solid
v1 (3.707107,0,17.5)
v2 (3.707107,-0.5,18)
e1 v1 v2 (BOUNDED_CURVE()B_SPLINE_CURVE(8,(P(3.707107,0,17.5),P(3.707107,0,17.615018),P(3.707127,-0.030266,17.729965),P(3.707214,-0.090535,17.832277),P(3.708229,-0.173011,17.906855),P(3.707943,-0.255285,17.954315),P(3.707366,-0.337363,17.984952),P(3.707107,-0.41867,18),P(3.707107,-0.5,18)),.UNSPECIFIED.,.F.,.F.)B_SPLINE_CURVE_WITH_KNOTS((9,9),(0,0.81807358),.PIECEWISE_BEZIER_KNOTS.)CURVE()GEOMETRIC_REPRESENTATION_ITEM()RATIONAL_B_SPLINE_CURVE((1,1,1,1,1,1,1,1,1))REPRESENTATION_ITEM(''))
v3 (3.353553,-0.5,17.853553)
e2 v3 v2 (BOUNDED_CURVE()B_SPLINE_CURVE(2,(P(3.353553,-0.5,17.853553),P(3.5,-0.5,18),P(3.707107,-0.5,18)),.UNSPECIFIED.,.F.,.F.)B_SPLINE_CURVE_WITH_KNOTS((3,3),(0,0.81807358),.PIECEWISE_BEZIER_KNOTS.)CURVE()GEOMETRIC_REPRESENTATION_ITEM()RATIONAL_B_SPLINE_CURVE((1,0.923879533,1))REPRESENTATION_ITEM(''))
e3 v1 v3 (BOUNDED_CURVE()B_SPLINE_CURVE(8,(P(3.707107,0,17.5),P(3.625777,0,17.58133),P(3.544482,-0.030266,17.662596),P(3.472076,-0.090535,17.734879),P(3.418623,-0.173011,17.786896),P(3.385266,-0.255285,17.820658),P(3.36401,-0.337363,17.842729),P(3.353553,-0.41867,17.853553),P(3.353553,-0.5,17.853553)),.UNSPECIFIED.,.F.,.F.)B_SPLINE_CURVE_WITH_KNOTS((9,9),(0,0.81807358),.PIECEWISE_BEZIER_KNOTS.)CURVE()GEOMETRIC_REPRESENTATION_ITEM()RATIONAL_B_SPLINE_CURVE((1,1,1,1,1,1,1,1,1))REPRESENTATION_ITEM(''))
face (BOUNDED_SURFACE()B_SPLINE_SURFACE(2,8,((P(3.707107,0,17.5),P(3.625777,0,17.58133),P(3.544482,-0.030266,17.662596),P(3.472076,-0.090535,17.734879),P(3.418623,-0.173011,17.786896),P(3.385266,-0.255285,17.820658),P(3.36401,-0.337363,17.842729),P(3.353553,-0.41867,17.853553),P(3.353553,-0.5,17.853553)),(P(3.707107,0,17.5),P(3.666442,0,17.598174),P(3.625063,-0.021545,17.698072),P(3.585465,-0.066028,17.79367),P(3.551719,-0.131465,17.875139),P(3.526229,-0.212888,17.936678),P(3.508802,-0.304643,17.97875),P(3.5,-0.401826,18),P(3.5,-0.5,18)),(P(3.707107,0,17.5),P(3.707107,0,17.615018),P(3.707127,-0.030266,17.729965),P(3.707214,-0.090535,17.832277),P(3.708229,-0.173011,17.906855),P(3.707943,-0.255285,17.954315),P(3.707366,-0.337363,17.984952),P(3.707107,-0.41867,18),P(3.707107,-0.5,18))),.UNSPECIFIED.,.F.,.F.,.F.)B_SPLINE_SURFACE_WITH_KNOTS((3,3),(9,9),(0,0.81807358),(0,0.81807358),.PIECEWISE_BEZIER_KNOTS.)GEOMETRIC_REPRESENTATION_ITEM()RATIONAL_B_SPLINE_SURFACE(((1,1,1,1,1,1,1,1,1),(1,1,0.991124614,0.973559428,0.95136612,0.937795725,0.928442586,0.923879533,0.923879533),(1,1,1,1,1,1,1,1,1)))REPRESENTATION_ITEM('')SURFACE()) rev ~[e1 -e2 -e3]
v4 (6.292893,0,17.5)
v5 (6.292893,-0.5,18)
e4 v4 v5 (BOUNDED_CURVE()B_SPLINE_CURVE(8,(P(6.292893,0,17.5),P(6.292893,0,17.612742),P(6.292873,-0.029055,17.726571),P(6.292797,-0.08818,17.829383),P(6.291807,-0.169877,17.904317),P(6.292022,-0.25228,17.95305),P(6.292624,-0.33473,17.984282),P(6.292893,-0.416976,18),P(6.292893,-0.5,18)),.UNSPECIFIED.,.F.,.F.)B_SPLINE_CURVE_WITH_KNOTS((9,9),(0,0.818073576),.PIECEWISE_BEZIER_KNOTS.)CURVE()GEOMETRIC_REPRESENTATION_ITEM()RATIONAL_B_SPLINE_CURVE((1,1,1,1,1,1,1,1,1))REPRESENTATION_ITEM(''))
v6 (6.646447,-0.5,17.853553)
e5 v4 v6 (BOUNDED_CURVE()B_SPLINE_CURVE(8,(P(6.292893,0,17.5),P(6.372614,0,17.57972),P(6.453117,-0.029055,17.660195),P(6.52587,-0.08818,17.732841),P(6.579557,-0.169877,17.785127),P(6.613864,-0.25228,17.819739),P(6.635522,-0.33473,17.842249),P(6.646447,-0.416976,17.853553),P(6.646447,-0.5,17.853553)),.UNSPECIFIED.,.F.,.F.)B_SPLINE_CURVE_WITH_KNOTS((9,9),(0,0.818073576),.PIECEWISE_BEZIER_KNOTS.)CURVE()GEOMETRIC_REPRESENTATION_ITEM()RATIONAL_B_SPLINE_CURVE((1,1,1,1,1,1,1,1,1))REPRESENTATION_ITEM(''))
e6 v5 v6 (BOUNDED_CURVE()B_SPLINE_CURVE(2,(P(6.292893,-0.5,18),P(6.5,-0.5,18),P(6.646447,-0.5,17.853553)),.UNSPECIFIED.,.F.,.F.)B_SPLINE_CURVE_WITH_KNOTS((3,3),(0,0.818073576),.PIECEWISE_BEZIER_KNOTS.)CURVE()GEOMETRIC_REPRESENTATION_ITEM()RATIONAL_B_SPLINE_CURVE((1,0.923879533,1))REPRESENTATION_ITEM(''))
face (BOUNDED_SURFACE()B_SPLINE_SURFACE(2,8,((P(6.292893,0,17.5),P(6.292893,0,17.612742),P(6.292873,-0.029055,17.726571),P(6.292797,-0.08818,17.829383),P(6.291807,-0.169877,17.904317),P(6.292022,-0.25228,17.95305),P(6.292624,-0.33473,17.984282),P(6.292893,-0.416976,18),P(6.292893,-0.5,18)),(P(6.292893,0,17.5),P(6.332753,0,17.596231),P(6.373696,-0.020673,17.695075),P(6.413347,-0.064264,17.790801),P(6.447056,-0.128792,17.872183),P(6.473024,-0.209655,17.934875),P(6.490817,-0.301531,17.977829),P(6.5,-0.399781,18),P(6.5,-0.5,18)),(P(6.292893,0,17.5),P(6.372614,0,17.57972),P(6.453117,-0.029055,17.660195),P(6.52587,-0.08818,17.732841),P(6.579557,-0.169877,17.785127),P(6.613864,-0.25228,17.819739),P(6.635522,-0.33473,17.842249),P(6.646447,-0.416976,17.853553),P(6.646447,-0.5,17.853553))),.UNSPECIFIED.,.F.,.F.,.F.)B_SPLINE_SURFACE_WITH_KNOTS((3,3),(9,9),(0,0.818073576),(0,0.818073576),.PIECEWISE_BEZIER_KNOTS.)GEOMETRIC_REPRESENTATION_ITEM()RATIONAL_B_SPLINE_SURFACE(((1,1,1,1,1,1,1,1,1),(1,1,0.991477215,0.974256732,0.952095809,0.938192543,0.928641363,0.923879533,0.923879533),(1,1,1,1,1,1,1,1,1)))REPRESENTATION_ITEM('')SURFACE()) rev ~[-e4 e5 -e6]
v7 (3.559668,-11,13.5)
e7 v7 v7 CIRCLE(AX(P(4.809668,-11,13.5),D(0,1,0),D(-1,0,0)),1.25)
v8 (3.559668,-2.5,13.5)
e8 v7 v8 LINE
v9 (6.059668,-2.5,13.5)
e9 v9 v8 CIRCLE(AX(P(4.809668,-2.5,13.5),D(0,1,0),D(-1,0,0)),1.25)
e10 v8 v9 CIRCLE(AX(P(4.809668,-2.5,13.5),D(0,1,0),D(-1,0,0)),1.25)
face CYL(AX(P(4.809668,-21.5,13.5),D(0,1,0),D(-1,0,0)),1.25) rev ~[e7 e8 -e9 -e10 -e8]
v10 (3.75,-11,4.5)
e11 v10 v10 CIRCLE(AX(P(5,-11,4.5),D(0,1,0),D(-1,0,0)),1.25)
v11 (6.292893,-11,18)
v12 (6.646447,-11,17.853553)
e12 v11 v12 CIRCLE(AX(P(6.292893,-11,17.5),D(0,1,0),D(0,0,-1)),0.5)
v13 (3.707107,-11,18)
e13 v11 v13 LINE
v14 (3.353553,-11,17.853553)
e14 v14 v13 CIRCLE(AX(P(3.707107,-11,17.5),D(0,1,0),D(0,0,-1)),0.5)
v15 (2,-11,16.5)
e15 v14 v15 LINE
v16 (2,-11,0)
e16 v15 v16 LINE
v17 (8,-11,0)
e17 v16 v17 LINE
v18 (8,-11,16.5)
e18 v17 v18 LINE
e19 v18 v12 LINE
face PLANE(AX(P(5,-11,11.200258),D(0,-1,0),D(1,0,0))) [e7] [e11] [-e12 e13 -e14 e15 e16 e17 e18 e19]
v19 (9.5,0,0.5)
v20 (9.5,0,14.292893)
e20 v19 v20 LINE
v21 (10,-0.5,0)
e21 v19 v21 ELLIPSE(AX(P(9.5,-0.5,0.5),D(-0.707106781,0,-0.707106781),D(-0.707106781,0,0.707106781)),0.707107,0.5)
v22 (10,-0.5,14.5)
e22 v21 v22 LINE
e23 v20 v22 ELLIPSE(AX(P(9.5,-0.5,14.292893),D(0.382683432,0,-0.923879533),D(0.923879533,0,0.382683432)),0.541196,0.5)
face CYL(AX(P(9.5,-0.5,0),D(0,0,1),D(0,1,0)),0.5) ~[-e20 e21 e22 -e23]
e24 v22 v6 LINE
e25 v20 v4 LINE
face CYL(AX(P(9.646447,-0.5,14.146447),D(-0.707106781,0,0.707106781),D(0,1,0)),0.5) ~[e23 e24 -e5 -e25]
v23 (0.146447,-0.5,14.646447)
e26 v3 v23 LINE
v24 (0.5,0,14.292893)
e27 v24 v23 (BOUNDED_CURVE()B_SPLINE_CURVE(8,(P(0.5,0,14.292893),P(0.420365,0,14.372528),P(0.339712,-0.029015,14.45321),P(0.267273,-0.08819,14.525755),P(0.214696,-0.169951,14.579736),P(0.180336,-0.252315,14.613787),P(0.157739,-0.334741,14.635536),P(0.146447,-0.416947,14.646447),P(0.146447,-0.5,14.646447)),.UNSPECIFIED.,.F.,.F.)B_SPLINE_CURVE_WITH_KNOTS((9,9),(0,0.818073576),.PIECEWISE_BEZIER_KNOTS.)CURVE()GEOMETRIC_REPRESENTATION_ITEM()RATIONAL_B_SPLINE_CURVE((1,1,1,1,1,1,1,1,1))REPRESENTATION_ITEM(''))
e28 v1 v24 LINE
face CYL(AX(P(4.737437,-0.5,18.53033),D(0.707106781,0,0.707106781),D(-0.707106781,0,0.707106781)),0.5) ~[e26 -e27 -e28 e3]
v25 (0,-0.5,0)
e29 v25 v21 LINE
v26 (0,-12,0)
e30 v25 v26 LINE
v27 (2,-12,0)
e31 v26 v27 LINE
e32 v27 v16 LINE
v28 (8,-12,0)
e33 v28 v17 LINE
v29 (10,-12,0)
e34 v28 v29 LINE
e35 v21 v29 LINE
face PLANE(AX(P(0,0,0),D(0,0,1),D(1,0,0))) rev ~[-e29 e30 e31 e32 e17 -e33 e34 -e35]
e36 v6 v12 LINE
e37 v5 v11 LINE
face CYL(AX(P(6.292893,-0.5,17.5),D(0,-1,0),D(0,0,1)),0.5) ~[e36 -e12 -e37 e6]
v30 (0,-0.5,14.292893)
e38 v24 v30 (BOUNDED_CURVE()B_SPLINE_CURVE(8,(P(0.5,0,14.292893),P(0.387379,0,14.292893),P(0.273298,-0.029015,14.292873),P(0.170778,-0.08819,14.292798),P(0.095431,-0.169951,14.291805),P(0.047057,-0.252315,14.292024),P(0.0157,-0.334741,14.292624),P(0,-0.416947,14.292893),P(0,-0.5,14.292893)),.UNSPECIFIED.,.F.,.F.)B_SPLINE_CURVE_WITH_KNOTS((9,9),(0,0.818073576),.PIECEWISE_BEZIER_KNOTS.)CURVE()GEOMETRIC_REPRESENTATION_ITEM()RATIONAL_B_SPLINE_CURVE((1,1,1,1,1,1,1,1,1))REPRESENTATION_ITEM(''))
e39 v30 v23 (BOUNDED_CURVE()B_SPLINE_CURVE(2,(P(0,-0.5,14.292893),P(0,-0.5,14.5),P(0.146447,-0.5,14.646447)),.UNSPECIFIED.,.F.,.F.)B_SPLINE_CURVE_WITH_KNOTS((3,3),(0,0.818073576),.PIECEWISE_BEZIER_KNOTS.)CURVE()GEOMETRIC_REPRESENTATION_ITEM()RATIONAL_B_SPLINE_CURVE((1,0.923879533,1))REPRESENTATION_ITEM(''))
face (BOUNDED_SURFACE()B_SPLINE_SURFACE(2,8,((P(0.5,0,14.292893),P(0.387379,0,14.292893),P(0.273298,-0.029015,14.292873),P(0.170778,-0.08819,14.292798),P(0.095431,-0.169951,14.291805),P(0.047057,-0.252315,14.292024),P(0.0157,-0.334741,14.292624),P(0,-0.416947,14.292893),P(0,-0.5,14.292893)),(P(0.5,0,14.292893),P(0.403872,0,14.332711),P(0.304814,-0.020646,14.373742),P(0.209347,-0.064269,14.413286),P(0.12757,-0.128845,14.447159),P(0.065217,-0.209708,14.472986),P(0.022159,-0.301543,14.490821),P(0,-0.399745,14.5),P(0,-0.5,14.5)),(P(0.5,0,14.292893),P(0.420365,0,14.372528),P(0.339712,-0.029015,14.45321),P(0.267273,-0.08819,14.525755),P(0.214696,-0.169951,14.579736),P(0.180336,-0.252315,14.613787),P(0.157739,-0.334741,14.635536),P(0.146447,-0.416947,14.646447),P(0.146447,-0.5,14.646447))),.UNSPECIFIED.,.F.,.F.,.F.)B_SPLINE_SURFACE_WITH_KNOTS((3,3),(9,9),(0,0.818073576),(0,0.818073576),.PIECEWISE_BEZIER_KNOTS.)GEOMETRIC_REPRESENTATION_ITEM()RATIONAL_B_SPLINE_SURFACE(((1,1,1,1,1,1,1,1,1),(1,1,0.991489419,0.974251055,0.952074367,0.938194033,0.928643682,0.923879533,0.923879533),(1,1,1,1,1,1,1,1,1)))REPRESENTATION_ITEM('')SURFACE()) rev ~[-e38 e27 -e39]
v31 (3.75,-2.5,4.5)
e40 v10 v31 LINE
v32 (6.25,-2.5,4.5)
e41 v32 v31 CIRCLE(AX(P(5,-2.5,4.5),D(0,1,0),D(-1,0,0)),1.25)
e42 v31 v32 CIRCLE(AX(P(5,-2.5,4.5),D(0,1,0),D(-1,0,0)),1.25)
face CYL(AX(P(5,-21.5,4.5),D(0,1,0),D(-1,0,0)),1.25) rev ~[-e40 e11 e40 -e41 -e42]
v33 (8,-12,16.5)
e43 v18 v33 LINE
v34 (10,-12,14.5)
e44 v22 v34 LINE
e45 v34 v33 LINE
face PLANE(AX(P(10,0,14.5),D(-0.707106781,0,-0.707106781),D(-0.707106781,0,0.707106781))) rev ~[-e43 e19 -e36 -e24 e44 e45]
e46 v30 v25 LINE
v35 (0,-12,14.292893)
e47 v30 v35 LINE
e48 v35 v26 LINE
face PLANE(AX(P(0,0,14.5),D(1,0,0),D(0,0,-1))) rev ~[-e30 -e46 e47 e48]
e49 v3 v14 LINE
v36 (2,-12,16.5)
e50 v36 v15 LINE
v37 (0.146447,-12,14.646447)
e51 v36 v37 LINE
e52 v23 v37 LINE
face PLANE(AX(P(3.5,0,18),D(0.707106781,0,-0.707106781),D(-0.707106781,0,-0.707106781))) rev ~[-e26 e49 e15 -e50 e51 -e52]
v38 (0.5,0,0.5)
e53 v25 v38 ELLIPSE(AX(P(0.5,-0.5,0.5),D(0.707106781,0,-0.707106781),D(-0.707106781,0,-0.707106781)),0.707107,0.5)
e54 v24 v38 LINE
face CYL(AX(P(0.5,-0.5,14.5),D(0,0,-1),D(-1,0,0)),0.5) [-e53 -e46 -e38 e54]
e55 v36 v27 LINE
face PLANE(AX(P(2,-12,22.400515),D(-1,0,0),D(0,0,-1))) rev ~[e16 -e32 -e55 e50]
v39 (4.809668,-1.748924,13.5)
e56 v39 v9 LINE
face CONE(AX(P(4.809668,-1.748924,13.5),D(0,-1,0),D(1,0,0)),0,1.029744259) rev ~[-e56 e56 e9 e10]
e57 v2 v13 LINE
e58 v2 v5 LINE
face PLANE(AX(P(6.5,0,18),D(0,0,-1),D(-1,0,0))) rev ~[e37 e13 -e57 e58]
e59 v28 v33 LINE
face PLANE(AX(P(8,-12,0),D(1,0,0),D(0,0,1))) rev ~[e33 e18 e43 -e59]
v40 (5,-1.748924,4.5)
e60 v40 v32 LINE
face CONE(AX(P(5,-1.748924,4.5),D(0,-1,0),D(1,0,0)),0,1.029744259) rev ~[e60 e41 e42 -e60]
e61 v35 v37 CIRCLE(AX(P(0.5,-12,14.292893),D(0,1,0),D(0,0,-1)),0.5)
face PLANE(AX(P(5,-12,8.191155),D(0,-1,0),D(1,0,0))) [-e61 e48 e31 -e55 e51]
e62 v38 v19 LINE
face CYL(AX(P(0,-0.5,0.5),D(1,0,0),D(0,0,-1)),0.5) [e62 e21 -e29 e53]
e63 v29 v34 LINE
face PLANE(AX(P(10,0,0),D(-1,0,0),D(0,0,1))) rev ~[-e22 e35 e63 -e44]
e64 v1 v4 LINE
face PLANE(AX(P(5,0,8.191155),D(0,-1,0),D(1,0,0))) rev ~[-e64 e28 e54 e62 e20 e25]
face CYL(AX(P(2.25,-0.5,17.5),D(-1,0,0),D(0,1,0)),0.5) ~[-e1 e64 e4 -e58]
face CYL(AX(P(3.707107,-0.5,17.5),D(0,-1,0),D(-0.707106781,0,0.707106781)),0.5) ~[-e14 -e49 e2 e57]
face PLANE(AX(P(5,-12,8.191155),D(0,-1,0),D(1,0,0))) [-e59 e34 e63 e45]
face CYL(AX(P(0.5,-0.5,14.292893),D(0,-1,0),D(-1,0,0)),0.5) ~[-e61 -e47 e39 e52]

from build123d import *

# Parameters (mm, degrees)
F1_DEPTH    = 12
F2_W        = 6
F2_H        = 22.400515154
F4_DEPTH    = 1
F6_D        = 2.5
F6_DEPTH    = 9.5
F6_TIP      = 0.7510757738
F7_R        = 0.5
F8_T1_DEPTH = 4.7928932188
F8_T3_DEPTH = 6.7426406871
F9_R        = 0.5


# Not quite as in the source:
# - a fillet or chamfer that OpenCascade refuses, or shapes differently, is made with other operations: its cross-section is extruded or revolved along the edge and cut away or added


with BuildPart() as f1:
    # F0 (on Front) → F1 (new body)
    with BuildSketch(Plane.XZ):
        Polygon((0, 14.5), (0, 0), (10, 0), (10, 14.5), (6.5, 18), (3.5, 18), align=None)
    extrude(amount=F1_DEPTH)

    # F2 (on face) → F4 (cut)
    with BuildSketch(Plane.XZ.offset(12)):
        with Locations((5, 11.200257577)):
            Rectangle(F2_W, F2_H)
        Polygon((2, 16.5), (2, 0), (8, 0), (8, 16.5), (6.5, 18), (3.5, 18), align=None)
    extrude(amount=-F4_DEPTH, mode=Mode.SUBTRACT)

    # F6
    with Locations(Plane.XZ.offset(12)):
        with Locations((4.8096684931, 13.5), (5, 4.5)):
            Hole(F6_D / 2, depth=F6_DEPTH)
            with Locations((0, 0, -(F6_DEPTH + F6_TIP / 2))):  # 118° drill point
                Cone(0, F6_D / 2, F6_TIP, mode=Mode.SUBTRACT)

    # F7
    f7_edges = [f1.edges().sort_by_distance(p)[0] for p in [
        (10, 0, 7.25),
        (8.25, 0, 16.25),
        (0, 0, 7.25),
        (5, 0, 0),
    ]]
    fillet(f7_edges, radius=F7_R)

    # F8: fillet of radius 0.5 on 2 edges, made by hand

    # F8_s2 → F8_t1 (cut)
    with BuildSketch(Plane.YZ.offset(2.25)):
        with BuildLine():
            ThreePointArc((0, 17.5), (-0.1464466094, 17.8535533906), (-0.5, 18))
            Line((-0.5, 18), (0, 18))
            Line((0, 18), (0, 17.5))
        make_face()
    extrude(amount=F8_T1_DEPTH, mode=Mode.SUBTRACT)

    # F8_s4 → F8_t3 (cut)
    with BuildSketch(Plane(origin=(11.6338834765, 0, 11.6338834765), x_dir=(0, 1, 0), z_dir=(-0.7071067812, 0, -0.7071067812))):
        with BuildLine():
            ThreePointArc((-0.5, -10.2530483272), (-0.1464466094, -10.1066017178), (0, -9.7530483272))
            Line((0, -9.7530483272), (0, -10.2530483272))
            Line((0, -10.2530483272), (-0.5, -10.2530483272))
        make_face()
    extrude(amount=F8_T3_DEPTH, mode=Mode.SUBTRACT)

    # F9
    f9_edges = [f1.edges().sort_by_distance(p)[0] for p in [
        (3.5, -5.75, 18),
        (0, -6.25, 14.5),
        (6.5, -5.75, 18),
    ]]
    fillet(f9_edges, radius=F9_R)


solid = f1.part
